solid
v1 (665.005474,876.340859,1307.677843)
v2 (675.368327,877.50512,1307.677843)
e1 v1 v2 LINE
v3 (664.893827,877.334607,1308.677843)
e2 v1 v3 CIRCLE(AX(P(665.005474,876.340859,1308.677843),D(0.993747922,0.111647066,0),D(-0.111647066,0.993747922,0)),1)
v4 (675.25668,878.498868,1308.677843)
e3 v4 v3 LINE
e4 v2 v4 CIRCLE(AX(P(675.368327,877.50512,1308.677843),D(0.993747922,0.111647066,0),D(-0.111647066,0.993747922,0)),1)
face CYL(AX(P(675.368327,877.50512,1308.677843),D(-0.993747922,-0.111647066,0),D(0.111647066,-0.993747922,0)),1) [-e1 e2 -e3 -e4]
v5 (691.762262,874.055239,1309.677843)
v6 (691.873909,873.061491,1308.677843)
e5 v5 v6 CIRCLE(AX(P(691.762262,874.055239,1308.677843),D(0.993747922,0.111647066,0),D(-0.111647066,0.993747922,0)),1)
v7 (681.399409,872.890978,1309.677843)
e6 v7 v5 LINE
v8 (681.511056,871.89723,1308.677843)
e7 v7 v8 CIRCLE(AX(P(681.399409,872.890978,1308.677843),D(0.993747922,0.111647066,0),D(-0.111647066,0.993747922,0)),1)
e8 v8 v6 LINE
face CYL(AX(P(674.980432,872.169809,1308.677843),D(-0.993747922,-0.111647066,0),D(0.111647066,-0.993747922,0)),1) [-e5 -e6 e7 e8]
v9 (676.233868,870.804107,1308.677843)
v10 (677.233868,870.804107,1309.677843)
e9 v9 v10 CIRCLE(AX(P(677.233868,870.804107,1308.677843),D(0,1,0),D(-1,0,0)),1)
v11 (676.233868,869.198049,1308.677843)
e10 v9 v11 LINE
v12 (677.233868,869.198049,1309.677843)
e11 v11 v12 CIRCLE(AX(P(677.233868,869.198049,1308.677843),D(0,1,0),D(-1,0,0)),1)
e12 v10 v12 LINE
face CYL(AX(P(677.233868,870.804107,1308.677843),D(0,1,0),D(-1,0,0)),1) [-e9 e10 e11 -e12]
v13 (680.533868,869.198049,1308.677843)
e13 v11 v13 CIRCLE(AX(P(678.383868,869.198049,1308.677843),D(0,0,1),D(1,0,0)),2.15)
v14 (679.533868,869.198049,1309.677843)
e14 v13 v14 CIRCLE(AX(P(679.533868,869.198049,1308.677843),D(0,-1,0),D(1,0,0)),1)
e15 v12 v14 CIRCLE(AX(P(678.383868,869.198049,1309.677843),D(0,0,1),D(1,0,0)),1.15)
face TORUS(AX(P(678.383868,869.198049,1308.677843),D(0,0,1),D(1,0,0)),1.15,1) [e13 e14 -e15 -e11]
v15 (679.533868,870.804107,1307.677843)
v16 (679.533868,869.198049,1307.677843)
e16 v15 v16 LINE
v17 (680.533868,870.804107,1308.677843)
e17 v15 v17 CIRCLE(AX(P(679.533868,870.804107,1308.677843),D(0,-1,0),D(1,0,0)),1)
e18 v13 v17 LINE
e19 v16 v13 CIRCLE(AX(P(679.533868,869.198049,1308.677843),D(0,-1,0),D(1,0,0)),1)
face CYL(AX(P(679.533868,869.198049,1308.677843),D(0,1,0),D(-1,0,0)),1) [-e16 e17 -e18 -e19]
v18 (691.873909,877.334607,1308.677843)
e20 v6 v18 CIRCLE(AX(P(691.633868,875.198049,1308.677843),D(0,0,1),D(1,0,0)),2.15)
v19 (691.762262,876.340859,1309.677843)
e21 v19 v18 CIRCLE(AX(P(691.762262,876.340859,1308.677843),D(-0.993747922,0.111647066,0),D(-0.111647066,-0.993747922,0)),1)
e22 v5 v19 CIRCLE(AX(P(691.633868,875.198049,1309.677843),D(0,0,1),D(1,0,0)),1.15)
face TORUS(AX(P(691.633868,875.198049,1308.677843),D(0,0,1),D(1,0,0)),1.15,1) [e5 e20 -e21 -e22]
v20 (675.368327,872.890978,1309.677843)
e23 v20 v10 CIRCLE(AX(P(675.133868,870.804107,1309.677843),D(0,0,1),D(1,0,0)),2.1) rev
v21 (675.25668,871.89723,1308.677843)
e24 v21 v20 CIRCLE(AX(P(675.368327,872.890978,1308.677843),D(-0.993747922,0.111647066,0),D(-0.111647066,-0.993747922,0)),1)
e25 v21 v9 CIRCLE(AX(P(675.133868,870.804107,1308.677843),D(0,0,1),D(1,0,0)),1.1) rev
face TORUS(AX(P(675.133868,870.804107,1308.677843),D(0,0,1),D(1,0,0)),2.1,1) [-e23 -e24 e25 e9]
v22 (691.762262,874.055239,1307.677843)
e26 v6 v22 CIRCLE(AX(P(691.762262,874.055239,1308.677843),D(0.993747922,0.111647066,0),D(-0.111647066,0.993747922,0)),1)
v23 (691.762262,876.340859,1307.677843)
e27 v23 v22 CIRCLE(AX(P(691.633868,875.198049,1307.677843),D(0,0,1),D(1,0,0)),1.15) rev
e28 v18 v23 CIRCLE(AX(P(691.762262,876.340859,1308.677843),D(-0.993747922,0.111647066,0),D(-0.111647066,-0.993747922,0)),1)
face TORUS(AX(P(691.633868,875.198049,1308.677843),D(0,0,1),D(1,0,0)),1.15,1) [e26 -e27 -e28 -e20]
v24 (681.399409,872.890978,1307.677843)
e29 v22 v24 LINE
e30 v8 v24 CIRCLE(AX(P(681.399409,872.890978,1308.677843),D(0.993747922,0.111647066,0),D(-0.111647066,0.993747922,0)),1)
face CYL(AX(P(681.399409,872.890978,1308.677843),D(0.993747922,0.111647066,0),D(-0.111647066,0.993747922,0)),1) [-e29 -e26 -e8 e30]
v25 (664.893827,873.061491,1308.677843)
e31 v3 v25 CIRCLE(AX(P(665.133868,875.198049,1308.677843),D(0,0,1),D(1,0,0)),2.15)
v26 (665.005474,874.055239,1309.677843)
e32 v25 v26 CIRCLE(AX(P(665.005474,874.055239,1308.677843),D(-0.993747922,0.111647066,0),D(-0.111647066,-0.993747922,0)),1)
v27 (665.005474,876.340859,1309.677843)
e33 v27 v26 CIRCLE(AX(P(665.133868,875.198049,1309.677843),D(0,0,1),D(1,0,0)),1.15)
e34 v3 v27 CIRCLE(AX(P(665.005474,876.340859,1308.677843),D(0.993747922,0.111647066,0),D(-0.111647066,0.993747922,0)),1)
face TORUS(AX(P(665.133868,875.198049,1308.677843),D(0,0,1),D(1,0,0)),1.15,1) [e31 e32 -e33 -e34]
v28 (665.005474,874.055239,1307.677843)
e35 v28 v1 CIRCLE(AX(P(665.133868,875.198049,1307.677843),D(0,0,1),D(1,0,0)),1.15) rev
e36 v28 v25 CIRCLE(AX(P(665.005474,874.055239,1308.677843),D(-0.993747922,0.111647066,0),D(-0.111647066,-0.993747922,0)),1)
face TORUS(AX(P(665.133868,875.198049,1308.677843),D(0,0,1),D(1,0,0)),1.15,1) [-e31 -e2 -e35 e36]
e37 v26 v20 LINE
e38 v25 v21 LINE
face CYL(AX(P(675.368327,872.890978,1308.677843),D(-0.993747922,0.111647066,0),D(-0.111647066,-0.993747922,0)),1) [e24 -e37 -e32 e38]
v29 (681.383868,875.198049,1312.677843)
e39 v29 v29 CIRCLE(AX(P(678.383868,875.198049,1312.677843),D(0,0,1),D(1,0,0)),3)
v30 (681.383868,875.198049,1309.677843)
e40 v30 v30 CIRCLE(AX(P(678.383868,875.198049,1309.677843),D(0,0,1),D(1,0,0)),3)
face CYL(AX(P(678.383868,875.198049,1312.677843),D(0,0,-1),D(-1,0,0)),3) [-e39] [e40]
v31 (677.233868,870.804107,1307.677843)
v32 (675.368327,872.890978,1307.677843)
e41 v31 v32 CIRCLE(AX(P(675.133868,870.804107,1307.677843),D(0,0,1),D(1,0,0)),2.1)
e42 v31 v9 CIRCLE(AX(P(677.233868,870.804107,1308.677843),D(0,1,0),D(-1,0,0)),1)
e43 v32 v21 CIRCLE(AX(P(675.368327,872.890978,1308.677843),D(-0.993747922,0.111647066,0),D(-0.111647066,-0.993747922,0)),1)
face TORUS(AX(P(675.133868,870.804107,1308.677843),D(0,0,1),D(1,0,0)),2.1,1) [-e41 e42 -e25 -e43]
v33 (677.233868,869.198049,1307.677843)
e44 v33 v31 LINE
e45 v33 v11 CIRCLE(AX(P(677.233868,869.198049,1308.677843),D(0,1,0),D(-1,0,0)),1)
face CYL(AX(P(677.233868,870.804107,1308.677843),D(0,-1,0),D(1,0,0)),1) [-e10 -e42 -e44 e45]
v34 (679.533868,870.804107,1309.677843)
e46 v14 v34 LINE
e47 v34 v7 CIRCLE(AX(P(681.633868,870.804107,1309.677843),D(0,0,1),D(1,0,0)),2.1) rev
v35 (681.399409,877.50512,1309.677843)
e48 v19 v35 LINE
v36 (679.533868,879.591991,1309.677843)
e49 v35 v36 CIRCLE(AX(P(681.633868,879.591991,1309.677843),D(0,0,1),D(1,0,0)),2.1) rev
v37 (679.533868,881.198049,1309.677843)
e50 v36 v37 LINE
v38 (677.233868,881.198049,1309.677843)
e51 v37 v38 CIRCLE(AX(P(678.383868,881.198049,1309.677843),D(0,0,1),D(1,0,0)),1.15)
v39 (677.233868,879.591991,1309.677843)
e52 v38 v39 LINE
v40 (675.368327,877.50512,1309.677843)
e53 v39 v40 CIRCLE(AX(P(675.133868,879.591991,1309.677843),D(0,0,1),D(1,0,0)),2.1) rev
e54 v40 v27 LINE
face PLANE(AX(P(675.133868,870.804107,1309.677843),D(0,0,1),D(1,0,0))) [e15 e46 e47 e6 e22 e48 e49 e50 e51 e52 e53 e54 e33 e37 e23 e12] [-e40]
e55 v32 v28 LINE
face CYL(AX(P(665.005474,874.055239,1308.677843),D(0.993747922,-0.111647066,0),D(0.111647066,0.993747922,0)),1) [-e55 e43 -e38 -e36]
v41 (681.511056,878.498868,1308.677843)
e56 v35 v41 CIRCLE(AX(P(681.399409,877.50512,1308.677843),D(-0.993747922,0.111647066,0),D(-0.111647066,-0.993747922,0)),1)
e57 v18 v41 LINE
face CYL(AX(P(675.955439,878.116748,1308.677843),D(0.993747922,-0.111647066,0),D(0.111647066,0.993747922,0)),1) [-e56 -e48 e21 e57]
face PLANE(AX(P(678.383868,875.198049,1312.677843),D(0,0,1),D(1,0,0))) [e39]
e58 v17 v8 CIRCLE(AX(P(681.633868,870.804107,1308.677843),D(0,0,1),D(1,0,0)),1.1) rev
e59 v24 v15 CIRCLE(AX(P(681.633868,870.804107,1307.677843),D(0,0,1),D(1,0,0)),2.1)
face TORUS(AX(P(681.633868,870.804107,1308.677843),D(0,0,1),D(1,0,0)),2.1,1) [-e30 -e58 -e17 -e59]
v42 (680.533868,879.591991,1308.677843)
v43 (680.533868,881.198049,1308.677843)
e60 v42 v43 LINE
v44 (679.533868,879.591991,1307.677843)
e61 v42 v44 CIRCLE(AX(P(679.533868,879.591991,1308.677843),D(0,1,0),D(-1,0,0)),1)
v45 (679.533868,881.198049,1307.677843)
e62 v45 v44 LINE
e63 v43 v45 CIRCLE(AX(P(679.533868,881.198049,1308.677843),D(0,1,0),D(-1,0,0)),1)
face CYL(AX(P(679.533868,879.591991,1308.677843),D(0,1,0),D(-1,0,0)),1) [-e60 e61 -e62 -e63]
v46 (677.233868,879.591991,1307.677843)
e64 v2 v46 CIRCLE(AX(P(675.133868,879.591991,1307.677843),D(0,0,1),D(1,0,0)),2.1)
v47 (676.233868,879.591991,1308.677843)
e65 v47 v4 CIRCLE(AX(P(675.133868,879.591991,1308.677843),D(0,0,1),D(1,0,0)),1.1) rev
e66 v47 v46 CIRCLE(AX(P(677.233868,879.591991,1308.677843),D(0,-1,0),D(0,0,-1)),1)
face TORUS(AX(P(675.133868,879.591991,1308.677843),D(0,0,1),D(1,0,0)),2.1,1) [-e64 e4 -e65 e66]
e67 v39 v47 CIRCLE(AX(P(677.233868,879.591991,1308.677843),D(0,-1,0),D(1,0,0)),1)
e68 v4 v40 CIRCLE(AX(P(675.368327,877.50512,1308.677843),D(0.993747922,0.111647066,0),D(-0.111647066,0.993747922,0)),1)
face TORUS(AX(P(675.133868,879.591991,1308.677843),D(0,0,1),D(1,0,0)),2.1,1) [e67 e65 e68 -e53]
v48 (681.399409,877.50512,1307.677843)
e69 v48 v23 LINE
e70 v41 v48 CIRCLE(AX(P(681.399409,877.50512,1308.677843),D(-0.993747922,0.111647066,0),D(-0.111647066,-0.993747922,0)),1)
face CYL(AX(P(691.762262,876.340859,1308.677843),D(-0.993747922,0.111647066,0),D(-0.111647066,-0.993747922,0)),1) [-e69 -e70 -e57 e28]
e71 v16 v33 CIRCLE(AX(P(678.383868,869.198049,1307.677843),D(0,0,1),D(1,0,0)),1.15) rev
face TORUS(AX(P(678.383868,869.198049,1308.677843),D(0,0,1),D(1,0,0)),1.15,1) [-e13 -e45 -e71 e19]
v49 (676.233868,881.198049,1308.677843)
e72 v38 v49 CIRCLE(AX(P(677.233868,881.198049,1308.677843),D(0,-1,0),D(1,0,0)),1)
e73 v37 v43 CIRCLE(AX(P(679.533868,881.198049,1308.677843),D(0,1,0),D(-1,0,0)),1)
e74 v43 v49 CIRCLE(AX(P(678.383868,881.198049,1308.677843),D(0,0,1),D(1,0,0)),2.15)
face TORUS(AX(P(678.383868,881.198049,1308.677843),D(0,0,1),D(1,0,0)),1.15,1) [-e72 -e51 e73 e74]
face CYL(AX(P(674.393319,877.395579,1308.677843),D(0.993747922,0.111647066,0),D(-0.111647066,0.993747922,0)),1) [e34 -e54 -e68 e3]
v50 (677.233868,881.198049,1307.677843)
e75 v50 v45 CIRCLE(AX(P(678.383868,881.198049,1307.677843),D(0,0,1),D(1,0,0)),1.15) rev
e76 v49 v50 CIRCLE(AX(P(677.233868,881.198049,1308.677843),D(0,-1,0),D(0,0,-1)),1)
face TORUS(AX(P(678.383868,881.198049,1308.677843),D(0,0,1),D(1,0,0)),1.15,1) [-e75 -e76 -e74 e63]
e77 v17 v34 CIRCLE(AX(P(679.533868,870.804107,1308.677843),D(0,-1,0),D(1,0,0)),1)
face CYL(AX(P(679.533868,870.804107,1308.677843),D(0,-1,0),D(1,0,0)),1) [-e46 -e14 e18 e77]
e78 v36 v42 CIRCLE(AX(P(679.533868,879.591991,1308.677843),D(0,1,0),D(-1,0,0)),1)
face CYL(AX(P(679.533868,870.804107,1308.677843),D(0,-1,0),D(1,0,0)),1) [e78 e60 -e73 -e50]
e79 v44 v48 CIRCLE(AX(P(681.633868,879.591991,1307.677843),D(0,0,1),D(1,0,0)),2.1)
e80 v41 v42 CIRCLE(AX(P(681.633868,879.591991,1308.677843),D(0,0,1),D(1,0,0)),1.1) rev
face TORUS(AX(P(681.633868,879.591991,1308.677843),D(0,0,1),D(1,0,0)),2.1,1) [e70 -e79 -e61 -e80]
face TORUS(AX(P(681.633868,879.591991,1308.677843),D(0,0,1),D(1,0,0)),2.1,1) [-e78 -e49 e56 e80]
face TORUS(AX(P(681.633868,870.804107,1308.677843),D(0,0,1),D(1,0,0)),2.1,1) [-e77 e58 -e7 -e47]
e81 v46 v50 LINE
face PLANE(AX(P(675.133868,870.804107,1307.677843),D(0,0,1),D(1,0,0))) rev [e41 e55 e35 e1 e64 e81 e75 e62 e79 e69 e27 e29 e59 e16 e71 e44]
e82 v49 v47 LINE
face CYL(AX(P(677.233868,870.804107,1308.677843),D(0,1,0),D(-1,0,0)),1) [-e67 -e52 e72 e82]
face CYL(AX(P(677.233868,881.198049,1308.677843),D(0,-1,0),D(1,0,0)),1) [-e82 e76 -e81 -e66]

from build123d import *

# Parameters (mm, degrees)
BOSS_EXTRUDE1_DEPTH = 2
SKETCH2_R           = 3
BOSS_EXTRUDE2_DEPTH = 3
FILLET1_R           = 1


with BuildPart() as part:
    # Sketch1 → Boss-Extrude1 (new body)
    with BuildSketch(Plane.XY.offset(1307.677843453)):
        with BuildLine():
            Line((676.233867879, 870.804107087), (676.233867879, 869.198049015))
            ThreePointArc((676.233867879, 869.198049015), (678.383867879, 867.048049015), (680.533867879, 869.198049015))
            Line((680.533867879, 869.198049015), (680.533867879, 870.804107087))
            ThreePointArc((680.533867879, 870.804107087), (680.81377857, 871.537219306), (681.511056106, 871.897229801))
            Line((681.511056106, 871.897229801), (691.873909071, 873.061490983))
            ThreePointArc((691.873909071, 873.061490983), (693.783867879, 875.198049016), (691.873909071, 877.334607048))
            Line((691.873909071, 877.334607048), (681.511056106, 878.49886823))
            ThreePointArc((681.511056106, 878.49886823), (680.81377857, 878.858878725), (680.533867879, 879.591990944))
            Line((680.533867879, 879.591990944), (680.533867879, 881.198049015))
            ThreePointArc((680.533867879, 881.198049015), (678.383867879, 883.348049015), (676.233867879, 881.198049015))
            Line((676.233867879, 881.198049015), (676.233867879, 879.591990944))
            ThreePointArc((676.233867879, 879.591990944), (675.953957188, 878.858878725), (675.256679652, 878.49886823))
            Line((675.256679652, 878.49886823), (664.893826687, 877.334607048))
            ThreePointArc((664.893826687, 877.334607048), (662.983867879, 875.198049015), (664.893826687, 873.061490983))
            Line((664.893826687, 873.061490983), (675.256679652, 871.897229801))
            ThreePointArc((675.256679652, 871.897229801), (675.953957188, 871.537219305), (676.233867879, 870.804107087))
        make_face()
    extrude(amount=BOSS_EXTRUDE1_DEPTH)

    # Sketch2 → Boss-Extrude2 (add)
    with BuildSketch(Plane.XY.offset(1309.677843453)):
        with Locations((678.383867879, 875.198049015)):
            Circle(SKETCH2_R)
    extrude(amount=BOSS_EXTRUDE2_DEPTH)

    # Fillet1
    fillet1_edges = [part.edges().sort_by_distance(p)[0] for p in [
        (675.953957188, 878.858878725, 1307.677843453),
        (676.233867879, 880.39501998, 1307.677843453),
        (678.383867879, 883.348049015, 1307.677843453),
        (680.533867879, 880.39501998, 1307.677843453),
        (680.81377857, 878.858878725, 1307.677843453),
        (686.692482589, 877.916737639, 1307.677843453),
        (693.783867879, 875.198049016, 1307.677843453),
        (686.692482589, 872.479360392, 1307.677843453),
        (680.81377857, 871.537219306, 1307.677843453),
        (680.533867879, 870.001078051, 1307.677843453),
        (678.383867879, 867.048049015, 1307.677843453),
        (676.233867879, 870.001078051, 1307.677843453),
        (675.953957188, 871.537219305, 1307.677843453),
        (670.075253169, 872.479360392, 1307.677843453),
        (662.983867879, 875.198049015, 1307.677843453),
        (670.075253169, 877.916737639, 1307.677843453),
        (675.953957188, 878.858878725, 1309.677843453),
        (676.233867879, 880.39501998, 1309.677843453),
        (678.383867879, 883.348049015, 1309.677843453),
        (680.533867879, 880.39501998, 1309.677843453),
        (680.81377857, 878.858878725, 1309.677843453),
        (686.692482589, 877.916737639, 1309.677843453),
        (693.783867879, 875.198049016, 1309.677843453),
        (686.692482589, 872.479360392, 1309.677843453),
        (680.81377857, 871.537219306, 1309.677843453),
        (680.533867879, 870.001078051, 1309.677843453),
        (678.383867879, 867.048049015, 1309.677843453),
        (676.233867879, 870.001078051, 1309.677843453),
        (675.953957188, 871.537219305, 1309.677843453),
        (670.075253169, 872.479360392, 1309.677843453),
        (662.983867879, 875.198049015, 1309.677843453),
        (670.075253169, 877.916737639, 1309.677843453),
    ]]
    fillet(fillet1_edges, radius=FILLET1_R - 0.0001)  # a hair under: the kernel refuses the full size


solid = part.part
